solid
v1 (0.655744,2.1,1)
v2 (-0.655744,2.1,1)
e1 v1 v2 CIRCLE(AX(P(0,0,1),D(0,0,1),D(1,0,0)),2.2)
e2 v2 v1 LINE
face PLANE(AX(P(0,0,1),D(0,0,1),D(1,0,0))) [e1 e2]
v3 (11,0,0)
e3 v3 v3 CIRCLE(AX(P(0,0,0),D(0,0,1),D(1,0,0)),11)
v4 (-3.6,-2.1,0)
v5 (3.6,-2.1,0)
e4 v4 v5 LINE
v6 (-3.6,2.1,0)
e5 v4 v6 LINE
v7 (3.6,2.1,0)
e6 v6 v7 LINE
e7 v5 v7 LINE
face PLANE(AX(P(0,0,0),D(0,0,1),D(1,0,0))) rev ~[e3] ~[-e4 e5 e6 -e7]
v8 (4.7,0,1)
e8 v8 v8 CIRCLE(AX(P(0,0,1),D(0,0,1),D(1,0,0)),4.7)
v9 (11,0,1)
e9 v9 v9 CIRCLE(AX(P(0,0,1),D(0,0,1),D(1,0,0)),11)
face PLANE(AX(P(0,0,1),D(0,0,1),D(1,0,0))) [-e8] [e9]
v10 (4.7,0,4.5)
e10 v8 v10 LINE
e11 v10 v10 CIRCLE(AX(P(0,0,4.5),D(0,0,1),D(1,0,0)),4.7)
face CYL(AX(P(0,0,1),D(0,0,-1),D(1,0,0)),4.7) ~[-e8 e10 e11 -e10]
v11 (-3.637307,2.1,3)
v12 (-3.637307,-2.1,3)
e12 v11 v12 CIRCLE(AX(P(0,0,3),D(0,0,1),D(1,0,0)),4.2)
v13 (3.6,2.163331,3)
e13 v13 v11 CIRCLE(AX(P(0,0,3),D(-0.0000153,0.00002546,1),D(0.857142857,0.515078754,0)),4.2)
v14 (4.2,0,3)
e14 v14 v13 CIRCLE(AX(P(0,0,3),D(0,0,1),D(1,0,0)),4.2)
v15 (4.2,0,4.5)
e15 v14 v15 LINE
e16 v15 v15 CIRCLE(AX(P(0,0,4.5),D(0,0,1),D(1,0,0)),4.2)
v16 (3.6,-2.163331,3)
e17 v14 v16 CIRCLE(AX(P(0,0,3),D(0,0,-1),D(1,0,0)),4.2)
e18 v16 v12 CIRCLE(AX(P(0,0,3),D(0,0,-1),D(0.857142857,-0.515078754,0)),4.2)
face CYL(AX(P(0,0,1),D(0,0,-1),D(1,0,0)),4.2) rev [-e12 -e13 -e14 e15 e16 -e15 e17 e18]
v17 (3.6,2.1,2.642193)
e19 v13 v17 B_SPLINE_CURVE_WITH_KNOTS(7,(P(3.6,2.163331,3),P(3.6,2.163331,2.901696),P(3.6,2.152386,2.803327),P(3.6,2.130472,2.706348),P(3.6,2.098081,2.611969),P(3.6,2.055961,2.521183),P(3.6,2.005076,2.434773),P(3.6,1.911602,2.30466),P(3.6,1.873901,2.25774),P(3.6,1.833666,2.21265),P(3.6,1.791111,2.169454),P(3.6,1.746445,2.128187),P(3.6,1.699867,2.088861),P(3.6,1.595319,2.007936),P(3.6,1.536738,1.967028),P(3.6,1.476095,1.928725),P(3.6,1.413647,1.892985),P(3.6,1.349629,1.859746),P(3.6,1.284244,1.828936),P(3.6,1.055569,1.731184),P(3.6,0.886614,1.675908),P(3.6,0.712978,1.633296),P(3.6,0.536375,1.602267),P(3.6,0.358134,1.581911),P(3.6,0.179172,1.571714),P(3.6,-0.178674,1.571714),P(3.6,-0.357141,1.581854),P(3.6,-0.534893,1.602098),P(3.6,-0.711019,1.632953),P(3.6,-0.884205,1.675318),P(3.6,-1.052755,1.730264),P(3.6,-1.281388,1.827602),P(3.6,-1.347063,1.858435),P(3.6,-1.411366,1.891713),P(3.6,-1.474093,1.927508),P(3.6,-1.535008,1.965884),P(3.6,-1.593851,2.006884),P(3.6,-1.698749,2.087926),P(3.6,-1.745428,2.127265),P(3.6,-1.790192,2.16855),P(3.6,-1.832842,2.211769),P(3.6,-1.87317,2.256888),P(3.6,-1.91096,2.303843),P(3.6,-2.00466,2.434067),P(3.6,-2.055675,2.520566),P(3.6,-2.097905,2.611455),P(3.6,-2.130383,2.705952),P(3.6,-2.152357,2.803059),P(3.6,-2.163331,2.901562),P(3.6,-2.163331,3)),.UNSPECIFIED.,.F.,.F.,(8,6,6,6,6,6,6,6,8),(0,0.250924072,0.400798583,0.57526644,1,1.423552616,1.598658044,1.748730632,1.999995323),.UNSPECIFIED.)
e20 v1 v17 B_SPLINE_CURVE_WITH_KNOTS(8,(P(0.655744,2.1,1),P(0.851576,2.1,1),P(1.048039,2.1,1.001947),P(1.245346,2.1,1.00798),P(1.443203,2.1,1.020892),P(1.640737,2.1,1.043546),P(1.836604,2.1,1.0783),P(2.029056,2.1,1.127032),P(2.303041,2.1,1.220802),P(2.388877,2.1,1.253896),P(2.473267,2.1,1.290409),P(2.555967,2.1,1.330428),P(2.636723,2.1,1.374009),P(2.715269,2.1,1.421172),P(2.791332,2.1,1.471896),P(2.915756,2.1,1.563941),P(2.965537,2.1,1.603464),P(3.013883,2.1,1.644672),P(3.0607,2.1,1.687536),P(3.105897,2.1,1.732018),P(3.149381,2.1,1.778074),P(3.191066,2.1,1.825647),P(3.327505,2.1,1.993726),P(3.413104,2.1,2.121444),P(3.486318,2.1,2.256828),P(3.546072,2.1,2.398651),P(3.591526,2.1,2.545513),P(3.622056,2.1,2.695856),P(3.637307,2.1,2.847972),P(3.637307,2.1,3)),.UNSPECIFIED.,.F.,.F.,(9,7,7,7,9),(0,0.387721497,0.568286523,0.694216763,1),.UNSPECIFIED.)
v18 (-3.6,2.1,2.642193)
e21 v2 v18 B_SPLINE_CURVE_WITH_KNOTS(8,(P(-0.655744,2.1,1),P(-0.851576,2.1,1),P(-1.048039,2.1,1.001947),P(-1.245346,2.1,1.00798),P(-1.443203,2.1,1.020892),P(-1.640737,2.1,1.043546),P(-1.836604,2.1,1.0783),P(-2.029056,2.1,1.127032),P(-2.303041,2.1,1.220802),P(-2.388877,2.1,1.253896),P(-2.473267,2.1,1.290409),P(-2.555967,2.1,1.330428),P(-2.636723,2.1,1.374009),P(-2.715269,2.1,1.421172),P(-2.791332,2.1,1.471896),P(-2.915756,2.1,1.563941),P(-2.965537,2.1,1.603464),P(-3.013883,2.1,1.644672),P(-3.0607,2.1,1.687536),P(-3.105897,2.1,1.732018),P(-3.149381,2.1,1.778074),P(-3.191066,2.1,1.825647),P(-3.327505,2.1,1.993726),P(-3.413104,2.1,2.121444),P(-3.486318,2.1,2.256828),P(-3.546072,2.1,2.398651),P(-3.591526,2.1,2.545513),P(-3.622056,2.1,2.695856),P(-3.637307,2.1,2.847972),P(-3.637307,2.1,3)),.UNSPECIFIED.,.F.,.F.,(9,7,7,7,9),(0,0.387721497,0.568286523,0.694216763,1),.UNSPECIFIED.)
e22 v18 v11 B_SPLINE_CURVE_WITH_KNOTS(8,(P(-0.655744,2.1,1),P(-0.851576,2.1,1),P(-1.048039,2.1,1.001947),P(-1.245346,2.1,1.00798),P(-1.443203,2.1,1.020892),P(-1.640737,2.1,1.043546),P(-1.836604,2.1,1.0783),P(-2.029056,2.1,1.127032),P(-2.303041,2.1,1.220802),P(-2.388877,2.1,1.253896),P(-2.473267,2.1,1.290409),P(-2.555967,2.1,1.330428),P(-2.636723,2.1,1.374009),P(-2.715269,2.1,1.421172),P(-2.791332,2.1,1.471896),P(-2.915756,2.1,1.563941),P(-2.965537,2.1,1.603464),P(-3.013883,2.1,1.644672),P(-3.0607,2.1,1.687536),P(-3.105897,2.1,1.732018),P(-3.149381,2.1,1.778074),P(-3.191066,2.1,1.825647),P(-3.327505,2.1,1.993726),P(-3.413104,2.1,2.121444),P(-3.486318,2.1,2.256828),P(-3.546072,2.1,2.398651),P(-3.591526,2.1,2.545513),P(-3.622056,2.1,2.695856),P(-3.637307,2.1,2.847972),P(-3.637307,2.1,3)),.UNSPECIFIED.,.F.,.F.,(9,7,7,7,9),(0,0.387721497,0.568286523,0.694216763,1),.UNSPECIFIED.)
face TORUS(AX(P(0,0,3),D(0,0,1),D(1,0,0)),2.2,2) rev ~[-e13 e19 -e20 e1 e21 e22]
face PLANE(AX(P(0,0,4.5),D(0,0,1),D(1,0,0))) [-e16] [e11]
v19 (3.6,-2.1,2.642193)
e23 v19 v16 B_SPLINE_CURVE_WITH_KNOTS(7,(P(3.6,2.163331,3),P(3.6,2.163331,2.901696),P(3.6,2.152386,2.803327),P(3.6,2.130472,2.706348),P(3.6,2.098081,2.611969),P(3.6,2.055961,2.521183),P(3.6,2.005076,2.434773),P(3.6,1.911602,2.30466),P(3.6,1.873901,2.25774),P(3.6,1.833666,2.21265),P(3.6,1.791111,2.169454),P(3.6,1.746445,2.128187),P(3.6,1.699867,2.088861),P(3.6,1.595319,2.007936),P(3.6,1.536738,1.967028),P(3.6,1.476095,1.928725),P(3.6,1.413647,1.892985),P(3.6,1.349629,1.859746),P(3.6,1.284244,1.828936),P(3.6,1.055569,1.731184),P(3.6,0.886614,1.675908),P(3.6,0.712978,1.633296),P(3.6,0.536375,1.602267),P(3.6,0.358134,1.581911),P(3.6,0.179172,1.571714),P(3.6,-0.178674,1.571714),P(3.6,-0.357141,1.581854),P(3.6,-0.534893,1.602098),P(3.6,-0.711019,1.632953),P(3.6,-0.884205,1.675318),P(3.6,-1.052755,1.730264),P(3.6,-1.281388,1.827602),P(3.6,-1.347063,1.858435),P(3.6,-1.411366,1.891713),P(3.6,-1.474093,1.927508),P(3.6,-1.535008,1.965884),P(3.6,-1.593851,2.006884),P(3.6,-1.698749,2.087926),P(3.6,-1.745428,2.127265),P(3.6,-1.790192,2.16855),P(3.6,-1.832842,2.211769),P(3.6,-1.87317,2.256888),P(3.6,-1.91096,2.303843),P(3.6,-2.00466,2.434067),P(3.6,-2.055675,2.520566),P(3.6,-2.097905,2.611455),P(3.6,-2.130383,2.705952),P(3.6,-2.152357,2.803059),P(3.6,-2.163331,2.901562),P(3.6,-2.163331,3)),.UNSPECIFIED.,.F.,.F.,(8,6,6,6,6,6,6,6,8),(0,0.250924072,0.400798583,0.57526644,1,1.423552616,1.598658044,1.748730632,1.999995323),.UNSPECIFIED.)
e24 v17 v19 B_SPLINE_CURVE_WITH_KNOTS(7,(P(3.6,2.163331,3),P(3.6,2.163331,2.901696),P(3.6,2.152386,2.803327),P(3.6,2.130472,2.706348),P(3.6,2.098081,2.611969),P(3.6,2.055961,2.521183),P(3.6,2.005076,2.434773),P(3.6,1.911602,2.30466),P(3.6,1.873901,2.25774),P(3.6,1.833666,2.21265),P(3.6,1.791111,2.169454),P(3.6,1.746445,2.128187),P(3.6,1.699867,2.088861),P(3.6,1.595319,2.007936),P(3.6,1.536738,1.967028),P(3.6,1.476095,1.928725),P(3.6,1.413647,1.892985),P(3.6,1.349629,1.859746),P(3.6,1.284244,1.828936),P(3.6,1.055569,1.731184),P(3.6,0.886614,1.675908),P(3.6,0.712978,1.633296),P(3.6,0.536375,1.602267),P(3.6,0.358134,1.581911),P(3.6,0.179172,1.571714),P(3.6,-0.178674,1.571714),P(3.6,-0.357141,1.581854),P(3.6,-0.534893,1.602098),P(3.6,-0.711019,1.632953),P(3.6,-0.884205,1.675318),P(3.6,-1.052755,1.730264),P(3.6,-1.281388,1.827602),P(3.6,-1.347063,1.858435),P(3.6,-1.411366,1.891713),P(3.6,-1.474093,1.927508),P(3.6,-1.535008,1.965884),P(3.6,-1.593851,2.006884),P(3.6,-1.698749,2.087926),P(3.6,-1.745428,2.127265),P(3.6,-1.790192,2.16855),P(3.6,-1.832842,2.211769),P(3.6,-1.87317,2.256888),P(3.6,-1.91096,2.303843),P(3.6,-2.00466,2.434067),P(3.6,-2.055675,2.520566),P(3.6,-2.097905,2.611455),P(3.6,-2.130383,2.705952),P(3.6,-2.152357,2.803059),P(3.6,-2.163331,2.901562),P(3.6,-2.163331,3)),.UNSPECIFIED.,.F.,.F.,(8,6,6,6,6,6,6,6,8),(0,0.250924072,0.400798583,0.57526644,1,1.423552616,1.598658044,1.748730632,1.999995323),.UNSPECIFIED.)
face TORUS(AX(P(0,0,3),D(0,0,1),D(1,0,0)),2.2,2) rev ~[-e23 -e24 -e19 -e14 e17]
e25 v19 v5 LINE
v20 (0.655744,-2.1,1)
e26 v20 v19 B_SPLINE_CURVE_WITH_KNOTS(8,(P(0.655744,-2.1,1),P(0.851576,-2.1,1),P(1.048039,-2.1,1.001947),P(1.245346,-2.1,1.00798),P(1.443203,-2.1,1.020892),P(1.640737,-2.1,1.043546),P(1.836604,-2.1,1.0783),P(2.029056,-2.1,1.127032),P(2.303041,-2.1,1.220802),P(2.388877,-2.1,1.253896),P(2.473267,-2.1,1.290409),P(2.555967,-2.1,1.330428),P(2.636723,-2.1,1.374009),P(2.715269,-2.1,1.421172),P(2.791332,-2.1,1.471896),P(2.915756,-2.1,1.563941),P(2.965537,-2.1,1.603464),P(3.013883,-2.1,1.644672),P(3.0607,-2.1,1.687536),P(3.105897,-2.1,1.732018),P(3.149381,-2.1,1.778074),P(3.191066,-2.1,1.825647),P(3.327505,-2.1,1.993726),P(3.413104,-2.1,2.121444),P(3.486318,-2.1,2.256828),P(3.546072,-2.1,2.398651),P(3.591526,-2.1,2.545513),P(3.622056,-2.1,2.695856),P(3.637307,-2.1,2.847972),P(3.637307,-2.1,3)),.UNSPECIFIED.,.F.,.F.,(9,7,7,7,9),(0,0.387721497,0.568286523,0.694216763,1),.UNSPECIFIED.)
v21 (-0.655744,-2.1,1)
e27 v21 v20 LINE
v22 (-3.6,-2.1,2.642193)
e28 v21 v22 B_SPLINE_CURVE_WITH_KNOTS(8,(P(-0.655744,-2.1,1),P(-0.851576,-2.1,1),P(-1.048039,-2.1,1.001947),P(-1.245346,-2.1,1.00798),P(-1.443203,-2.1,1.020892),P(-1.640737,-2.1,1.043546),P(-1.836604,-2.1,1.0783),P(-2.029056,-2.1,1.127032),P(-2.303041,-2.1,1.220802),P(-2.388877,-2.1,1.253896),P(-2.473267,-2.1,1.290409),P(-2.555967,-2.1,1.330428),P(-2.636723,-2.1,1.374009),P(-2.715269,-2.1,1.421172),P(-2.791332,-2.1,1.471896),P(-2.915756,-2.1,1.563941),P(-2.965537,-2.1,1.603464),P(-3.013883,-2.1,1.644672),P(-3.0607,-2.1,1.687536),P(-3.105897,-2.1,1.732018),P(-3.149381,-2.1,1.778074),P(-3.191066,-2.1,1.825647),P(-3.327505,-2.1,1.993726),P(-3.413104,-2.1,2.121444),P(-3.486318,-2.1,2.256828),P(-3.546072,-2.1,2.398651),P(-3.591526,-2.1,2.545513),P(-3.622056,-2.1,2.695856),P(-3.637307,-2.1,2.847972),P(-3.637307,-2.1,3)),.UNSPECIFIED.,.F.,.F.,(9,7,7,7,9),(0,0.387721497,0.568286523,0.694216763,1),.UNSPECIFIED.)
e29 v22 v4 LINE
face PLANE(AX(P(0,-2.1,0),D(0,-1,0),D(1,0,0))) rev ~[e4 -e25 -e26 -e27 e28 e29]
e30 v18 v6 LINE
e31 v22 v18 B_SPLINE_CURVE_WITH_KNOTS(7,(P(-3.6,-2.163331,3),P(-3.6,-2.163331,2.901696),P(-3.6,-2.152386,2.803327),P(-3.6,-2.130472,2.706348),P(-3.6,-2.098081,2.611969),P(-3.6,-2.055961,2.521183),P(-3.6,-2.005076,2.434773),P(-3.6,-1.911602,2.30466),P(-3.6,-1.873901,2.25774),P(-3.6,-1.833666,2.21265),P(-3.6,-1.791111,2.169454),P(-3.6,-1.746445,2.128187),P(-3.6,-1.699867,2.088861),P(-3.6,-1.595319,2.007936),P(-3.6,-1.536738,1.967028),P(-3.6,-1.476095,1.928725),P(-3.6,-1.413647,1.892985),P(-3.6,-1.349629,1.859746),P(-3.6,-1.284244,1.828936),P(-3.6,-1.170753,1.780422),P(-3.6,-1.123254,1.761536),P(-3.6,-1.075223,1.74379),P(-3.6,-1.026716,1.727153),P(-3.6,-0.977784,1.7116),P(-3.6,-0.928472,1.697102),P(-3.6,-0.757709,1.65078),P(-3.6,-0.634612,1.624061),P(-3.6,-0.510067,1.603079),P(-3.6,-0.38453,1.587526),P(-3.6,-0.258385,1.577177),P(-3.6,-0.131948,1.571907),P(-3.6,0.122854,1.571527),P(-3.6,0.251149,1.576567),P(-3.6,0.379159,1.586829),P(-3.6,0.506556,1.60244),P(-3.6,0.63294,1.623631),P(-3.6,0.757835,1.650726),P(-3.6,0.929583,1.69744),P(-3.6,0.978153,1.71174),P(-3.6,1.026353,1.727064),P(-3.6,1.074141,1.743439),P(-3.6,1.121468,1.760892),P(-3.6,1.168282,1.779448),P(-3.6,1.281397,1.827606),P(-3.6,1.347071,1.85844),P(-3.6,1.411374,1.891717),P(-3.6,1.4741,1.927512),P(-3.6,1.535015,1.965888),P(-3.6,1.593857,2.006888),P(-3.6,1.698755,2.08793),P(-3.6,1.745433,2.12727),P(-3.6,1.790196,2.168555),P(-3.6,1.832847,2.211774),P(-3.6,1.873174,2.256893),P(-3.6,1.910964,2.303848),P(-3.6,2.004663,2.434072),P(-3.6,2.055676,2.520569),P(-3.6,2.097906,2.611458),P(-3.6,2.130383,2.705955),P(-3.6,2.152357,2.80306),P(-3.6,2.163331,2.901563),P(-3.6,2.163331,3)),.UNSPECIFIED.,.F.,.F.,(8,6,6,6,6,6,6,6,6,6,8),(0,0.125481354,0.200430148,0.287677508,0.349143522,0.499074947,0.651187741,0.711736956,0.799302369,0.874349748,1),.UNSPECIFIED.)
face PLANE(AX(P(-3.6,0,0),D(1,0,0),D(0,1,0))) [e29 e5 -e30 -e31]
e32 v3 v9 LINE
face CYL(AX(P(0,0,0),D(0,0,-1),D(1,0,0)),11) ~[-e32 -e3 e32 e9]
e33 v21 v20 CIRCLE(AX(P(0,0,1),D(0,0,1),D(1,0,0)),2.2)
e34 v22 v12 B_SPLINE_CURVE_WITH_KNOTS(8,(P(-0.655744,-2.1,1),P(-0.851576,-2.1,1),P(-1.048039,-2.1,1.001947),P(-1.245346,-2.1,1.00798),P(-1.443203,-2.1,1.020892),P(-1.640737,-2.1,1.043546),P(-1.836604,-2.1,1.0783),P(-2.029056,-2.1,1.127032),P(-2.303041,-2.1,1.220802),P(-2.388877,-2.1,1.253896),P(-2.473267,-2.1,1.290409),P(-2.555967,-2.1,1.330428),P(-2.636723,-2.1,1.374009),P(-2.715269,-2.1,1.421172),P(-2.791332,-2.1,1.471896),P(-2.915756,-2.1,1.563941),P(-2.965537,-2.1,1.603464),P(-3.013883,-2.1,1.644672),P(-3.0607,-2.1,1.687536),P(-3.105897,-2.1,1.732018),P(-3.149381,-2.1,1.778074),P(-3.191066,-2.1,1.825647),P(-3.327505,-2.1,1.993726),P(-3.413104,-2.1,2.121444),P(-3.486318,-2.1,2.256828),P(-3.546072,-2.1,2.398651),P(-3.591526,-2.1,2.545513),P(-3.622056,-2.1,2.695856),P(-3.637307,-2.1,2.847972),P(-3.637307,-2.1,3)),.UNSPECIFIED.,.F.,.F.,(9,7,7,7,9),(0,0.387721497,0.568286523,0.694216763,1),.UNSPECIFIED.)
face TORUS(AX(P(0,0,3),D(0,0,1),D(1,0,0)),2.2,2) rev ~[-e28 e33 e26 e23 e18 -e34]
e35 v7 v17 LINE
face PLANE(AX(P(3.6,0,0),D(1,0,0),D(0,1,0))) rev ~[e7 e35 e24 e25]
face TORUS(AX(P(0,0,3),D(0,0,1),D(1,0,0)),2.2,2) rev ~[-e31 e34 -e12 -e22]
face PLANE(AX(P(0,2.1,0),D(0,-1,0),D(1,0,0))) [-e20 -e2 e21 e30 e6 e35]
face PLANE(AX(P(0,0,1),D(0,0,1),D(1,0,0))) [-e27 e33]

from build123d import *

# Parameters (mm, degrees)
F0_R     = 11
F0_W     = 7.2
F0_H     = 4.2
F1_DEPTH = 1
F2_R     = 4.7
F2_R_2   = 4.2
F3_DEPTH = 3.5


# Not quite as in the source:
# - a fillet or chamfer that OpenCascade refuses, or shapes differently, is made with other operations: its cross-section is extruded or revolved along the edge and cut away or added


with BuildPart() as f1:
    # F0 (on Top) → F1 (new body)
    with BuildSketch(Plane.XY):
        Circle(F0_R)
        Rectangle(F0_W, F0_H, mode=Mode.SUBTRACT)
    extrude(amount=F1_DEPTH)

    # F2 (on face) → F3 (join)
    with BuildSketch(Plane.XY.offset(1)):
        Circle(F2_R)
        Circle(F2_R_2, mode=Mode.SUBTRACT)
    extrude(amount=F3_DEPTH)

    # F4: fillet of radius 2 on 1 edges, made by hand


with BuildPart() as f4_tool2:
    # F4_s3 → F4_t4 (revolve)
    with BuildSketch(Plane.XZ):
        with BuildLine():
            ThreePointArc((2.2, 1), (3.6142135624, 1.5857864376), (4.2, 3))
            Line((4.2, 3), (4.2, 1))
            Line((4.2, 1), (2.2, 1))
        make_face()
    revolve(axis=Axis((0, 0, 1), (0, 0, 1)))

    split(bisect_by=Plane.YZ.offset(3.6), keep=Keep.TOP)


with BuildPart() as f1_1:
    add(f1.part)

    # F4_t1: union F4_tool2
    add(f4_tool2.part)


with BuildPart() as f4_tool7:
    # F4_s8 → F4_t9 (revolve)
    with BuildSketch(Plane.XZ):
        with BuildLine():
            ThreePointArc((2.2, 1), (3.6142135624, 1.5857864376), (4.2, 3))
            Line((4.2, 3), (4.2, 1))
            Line((4.2, 1), (2.2, 1))
        make_face()
    revolve(axis=Axis((0, 0, 1), (0, 0, 1)))

    split(bisect_by=Plane.XZ.offset(-2.1), keep=Keep.BOTTOM)


with BuildPart() as f1_2:
    add(f1_1.part)

    # F4_t6: union F4_tool7
    add(f4_tool7.part)


with BuildPart() as f4_tool12:
    # F4_s13 → F4_t14 (revolve)
    with BuildSketch(Plane.XZ):
        with BuildLine():
            ThreePointArc((2.2, 1), (3.6142135624, 1.5857864376), (4.2, 3))
            Line((4.2, 3), (4.2, 1))
            Line((4.2, 1), (2.2, 1))
        make_face()
    revolve(axis=Axis((0, 0, 1), (0, 0, 1)))

    split(bisect_by=Plane.XZ.offset(2.1), keep=Keep.TOP)


with BuildPart() as f1_3:
    add(f1_2.part)

    # F4_t11: union F4_tool12
    add(f4_tool12.part)


with BuildPart() as f4_tool17:
    # F4_s18 → F4_t19 (revolve)
    with BuildSketch(Plane.XZ):
        with BuildLine():
            ThreePointArc((2.2, 1), (3.6142135624, 1.5857864376), (4.2, 3))
            Line((4.2, 3), (4.2, 1))
            Line((4.2, 1), (2.2, 1))
        make_face()
    revolve(axis=Axis((0, 0, 1), (0, 0, 1)))

    split(bisect_by=Plane.YZ.offset(-3.6), keep=Keep.BOTTOM)


with BuildPart() as f1_4:
    add(f1_3.part)

    # F4_t16: union F4_tool17
    add(f4_tool17.part)


solid = f1_4.part
